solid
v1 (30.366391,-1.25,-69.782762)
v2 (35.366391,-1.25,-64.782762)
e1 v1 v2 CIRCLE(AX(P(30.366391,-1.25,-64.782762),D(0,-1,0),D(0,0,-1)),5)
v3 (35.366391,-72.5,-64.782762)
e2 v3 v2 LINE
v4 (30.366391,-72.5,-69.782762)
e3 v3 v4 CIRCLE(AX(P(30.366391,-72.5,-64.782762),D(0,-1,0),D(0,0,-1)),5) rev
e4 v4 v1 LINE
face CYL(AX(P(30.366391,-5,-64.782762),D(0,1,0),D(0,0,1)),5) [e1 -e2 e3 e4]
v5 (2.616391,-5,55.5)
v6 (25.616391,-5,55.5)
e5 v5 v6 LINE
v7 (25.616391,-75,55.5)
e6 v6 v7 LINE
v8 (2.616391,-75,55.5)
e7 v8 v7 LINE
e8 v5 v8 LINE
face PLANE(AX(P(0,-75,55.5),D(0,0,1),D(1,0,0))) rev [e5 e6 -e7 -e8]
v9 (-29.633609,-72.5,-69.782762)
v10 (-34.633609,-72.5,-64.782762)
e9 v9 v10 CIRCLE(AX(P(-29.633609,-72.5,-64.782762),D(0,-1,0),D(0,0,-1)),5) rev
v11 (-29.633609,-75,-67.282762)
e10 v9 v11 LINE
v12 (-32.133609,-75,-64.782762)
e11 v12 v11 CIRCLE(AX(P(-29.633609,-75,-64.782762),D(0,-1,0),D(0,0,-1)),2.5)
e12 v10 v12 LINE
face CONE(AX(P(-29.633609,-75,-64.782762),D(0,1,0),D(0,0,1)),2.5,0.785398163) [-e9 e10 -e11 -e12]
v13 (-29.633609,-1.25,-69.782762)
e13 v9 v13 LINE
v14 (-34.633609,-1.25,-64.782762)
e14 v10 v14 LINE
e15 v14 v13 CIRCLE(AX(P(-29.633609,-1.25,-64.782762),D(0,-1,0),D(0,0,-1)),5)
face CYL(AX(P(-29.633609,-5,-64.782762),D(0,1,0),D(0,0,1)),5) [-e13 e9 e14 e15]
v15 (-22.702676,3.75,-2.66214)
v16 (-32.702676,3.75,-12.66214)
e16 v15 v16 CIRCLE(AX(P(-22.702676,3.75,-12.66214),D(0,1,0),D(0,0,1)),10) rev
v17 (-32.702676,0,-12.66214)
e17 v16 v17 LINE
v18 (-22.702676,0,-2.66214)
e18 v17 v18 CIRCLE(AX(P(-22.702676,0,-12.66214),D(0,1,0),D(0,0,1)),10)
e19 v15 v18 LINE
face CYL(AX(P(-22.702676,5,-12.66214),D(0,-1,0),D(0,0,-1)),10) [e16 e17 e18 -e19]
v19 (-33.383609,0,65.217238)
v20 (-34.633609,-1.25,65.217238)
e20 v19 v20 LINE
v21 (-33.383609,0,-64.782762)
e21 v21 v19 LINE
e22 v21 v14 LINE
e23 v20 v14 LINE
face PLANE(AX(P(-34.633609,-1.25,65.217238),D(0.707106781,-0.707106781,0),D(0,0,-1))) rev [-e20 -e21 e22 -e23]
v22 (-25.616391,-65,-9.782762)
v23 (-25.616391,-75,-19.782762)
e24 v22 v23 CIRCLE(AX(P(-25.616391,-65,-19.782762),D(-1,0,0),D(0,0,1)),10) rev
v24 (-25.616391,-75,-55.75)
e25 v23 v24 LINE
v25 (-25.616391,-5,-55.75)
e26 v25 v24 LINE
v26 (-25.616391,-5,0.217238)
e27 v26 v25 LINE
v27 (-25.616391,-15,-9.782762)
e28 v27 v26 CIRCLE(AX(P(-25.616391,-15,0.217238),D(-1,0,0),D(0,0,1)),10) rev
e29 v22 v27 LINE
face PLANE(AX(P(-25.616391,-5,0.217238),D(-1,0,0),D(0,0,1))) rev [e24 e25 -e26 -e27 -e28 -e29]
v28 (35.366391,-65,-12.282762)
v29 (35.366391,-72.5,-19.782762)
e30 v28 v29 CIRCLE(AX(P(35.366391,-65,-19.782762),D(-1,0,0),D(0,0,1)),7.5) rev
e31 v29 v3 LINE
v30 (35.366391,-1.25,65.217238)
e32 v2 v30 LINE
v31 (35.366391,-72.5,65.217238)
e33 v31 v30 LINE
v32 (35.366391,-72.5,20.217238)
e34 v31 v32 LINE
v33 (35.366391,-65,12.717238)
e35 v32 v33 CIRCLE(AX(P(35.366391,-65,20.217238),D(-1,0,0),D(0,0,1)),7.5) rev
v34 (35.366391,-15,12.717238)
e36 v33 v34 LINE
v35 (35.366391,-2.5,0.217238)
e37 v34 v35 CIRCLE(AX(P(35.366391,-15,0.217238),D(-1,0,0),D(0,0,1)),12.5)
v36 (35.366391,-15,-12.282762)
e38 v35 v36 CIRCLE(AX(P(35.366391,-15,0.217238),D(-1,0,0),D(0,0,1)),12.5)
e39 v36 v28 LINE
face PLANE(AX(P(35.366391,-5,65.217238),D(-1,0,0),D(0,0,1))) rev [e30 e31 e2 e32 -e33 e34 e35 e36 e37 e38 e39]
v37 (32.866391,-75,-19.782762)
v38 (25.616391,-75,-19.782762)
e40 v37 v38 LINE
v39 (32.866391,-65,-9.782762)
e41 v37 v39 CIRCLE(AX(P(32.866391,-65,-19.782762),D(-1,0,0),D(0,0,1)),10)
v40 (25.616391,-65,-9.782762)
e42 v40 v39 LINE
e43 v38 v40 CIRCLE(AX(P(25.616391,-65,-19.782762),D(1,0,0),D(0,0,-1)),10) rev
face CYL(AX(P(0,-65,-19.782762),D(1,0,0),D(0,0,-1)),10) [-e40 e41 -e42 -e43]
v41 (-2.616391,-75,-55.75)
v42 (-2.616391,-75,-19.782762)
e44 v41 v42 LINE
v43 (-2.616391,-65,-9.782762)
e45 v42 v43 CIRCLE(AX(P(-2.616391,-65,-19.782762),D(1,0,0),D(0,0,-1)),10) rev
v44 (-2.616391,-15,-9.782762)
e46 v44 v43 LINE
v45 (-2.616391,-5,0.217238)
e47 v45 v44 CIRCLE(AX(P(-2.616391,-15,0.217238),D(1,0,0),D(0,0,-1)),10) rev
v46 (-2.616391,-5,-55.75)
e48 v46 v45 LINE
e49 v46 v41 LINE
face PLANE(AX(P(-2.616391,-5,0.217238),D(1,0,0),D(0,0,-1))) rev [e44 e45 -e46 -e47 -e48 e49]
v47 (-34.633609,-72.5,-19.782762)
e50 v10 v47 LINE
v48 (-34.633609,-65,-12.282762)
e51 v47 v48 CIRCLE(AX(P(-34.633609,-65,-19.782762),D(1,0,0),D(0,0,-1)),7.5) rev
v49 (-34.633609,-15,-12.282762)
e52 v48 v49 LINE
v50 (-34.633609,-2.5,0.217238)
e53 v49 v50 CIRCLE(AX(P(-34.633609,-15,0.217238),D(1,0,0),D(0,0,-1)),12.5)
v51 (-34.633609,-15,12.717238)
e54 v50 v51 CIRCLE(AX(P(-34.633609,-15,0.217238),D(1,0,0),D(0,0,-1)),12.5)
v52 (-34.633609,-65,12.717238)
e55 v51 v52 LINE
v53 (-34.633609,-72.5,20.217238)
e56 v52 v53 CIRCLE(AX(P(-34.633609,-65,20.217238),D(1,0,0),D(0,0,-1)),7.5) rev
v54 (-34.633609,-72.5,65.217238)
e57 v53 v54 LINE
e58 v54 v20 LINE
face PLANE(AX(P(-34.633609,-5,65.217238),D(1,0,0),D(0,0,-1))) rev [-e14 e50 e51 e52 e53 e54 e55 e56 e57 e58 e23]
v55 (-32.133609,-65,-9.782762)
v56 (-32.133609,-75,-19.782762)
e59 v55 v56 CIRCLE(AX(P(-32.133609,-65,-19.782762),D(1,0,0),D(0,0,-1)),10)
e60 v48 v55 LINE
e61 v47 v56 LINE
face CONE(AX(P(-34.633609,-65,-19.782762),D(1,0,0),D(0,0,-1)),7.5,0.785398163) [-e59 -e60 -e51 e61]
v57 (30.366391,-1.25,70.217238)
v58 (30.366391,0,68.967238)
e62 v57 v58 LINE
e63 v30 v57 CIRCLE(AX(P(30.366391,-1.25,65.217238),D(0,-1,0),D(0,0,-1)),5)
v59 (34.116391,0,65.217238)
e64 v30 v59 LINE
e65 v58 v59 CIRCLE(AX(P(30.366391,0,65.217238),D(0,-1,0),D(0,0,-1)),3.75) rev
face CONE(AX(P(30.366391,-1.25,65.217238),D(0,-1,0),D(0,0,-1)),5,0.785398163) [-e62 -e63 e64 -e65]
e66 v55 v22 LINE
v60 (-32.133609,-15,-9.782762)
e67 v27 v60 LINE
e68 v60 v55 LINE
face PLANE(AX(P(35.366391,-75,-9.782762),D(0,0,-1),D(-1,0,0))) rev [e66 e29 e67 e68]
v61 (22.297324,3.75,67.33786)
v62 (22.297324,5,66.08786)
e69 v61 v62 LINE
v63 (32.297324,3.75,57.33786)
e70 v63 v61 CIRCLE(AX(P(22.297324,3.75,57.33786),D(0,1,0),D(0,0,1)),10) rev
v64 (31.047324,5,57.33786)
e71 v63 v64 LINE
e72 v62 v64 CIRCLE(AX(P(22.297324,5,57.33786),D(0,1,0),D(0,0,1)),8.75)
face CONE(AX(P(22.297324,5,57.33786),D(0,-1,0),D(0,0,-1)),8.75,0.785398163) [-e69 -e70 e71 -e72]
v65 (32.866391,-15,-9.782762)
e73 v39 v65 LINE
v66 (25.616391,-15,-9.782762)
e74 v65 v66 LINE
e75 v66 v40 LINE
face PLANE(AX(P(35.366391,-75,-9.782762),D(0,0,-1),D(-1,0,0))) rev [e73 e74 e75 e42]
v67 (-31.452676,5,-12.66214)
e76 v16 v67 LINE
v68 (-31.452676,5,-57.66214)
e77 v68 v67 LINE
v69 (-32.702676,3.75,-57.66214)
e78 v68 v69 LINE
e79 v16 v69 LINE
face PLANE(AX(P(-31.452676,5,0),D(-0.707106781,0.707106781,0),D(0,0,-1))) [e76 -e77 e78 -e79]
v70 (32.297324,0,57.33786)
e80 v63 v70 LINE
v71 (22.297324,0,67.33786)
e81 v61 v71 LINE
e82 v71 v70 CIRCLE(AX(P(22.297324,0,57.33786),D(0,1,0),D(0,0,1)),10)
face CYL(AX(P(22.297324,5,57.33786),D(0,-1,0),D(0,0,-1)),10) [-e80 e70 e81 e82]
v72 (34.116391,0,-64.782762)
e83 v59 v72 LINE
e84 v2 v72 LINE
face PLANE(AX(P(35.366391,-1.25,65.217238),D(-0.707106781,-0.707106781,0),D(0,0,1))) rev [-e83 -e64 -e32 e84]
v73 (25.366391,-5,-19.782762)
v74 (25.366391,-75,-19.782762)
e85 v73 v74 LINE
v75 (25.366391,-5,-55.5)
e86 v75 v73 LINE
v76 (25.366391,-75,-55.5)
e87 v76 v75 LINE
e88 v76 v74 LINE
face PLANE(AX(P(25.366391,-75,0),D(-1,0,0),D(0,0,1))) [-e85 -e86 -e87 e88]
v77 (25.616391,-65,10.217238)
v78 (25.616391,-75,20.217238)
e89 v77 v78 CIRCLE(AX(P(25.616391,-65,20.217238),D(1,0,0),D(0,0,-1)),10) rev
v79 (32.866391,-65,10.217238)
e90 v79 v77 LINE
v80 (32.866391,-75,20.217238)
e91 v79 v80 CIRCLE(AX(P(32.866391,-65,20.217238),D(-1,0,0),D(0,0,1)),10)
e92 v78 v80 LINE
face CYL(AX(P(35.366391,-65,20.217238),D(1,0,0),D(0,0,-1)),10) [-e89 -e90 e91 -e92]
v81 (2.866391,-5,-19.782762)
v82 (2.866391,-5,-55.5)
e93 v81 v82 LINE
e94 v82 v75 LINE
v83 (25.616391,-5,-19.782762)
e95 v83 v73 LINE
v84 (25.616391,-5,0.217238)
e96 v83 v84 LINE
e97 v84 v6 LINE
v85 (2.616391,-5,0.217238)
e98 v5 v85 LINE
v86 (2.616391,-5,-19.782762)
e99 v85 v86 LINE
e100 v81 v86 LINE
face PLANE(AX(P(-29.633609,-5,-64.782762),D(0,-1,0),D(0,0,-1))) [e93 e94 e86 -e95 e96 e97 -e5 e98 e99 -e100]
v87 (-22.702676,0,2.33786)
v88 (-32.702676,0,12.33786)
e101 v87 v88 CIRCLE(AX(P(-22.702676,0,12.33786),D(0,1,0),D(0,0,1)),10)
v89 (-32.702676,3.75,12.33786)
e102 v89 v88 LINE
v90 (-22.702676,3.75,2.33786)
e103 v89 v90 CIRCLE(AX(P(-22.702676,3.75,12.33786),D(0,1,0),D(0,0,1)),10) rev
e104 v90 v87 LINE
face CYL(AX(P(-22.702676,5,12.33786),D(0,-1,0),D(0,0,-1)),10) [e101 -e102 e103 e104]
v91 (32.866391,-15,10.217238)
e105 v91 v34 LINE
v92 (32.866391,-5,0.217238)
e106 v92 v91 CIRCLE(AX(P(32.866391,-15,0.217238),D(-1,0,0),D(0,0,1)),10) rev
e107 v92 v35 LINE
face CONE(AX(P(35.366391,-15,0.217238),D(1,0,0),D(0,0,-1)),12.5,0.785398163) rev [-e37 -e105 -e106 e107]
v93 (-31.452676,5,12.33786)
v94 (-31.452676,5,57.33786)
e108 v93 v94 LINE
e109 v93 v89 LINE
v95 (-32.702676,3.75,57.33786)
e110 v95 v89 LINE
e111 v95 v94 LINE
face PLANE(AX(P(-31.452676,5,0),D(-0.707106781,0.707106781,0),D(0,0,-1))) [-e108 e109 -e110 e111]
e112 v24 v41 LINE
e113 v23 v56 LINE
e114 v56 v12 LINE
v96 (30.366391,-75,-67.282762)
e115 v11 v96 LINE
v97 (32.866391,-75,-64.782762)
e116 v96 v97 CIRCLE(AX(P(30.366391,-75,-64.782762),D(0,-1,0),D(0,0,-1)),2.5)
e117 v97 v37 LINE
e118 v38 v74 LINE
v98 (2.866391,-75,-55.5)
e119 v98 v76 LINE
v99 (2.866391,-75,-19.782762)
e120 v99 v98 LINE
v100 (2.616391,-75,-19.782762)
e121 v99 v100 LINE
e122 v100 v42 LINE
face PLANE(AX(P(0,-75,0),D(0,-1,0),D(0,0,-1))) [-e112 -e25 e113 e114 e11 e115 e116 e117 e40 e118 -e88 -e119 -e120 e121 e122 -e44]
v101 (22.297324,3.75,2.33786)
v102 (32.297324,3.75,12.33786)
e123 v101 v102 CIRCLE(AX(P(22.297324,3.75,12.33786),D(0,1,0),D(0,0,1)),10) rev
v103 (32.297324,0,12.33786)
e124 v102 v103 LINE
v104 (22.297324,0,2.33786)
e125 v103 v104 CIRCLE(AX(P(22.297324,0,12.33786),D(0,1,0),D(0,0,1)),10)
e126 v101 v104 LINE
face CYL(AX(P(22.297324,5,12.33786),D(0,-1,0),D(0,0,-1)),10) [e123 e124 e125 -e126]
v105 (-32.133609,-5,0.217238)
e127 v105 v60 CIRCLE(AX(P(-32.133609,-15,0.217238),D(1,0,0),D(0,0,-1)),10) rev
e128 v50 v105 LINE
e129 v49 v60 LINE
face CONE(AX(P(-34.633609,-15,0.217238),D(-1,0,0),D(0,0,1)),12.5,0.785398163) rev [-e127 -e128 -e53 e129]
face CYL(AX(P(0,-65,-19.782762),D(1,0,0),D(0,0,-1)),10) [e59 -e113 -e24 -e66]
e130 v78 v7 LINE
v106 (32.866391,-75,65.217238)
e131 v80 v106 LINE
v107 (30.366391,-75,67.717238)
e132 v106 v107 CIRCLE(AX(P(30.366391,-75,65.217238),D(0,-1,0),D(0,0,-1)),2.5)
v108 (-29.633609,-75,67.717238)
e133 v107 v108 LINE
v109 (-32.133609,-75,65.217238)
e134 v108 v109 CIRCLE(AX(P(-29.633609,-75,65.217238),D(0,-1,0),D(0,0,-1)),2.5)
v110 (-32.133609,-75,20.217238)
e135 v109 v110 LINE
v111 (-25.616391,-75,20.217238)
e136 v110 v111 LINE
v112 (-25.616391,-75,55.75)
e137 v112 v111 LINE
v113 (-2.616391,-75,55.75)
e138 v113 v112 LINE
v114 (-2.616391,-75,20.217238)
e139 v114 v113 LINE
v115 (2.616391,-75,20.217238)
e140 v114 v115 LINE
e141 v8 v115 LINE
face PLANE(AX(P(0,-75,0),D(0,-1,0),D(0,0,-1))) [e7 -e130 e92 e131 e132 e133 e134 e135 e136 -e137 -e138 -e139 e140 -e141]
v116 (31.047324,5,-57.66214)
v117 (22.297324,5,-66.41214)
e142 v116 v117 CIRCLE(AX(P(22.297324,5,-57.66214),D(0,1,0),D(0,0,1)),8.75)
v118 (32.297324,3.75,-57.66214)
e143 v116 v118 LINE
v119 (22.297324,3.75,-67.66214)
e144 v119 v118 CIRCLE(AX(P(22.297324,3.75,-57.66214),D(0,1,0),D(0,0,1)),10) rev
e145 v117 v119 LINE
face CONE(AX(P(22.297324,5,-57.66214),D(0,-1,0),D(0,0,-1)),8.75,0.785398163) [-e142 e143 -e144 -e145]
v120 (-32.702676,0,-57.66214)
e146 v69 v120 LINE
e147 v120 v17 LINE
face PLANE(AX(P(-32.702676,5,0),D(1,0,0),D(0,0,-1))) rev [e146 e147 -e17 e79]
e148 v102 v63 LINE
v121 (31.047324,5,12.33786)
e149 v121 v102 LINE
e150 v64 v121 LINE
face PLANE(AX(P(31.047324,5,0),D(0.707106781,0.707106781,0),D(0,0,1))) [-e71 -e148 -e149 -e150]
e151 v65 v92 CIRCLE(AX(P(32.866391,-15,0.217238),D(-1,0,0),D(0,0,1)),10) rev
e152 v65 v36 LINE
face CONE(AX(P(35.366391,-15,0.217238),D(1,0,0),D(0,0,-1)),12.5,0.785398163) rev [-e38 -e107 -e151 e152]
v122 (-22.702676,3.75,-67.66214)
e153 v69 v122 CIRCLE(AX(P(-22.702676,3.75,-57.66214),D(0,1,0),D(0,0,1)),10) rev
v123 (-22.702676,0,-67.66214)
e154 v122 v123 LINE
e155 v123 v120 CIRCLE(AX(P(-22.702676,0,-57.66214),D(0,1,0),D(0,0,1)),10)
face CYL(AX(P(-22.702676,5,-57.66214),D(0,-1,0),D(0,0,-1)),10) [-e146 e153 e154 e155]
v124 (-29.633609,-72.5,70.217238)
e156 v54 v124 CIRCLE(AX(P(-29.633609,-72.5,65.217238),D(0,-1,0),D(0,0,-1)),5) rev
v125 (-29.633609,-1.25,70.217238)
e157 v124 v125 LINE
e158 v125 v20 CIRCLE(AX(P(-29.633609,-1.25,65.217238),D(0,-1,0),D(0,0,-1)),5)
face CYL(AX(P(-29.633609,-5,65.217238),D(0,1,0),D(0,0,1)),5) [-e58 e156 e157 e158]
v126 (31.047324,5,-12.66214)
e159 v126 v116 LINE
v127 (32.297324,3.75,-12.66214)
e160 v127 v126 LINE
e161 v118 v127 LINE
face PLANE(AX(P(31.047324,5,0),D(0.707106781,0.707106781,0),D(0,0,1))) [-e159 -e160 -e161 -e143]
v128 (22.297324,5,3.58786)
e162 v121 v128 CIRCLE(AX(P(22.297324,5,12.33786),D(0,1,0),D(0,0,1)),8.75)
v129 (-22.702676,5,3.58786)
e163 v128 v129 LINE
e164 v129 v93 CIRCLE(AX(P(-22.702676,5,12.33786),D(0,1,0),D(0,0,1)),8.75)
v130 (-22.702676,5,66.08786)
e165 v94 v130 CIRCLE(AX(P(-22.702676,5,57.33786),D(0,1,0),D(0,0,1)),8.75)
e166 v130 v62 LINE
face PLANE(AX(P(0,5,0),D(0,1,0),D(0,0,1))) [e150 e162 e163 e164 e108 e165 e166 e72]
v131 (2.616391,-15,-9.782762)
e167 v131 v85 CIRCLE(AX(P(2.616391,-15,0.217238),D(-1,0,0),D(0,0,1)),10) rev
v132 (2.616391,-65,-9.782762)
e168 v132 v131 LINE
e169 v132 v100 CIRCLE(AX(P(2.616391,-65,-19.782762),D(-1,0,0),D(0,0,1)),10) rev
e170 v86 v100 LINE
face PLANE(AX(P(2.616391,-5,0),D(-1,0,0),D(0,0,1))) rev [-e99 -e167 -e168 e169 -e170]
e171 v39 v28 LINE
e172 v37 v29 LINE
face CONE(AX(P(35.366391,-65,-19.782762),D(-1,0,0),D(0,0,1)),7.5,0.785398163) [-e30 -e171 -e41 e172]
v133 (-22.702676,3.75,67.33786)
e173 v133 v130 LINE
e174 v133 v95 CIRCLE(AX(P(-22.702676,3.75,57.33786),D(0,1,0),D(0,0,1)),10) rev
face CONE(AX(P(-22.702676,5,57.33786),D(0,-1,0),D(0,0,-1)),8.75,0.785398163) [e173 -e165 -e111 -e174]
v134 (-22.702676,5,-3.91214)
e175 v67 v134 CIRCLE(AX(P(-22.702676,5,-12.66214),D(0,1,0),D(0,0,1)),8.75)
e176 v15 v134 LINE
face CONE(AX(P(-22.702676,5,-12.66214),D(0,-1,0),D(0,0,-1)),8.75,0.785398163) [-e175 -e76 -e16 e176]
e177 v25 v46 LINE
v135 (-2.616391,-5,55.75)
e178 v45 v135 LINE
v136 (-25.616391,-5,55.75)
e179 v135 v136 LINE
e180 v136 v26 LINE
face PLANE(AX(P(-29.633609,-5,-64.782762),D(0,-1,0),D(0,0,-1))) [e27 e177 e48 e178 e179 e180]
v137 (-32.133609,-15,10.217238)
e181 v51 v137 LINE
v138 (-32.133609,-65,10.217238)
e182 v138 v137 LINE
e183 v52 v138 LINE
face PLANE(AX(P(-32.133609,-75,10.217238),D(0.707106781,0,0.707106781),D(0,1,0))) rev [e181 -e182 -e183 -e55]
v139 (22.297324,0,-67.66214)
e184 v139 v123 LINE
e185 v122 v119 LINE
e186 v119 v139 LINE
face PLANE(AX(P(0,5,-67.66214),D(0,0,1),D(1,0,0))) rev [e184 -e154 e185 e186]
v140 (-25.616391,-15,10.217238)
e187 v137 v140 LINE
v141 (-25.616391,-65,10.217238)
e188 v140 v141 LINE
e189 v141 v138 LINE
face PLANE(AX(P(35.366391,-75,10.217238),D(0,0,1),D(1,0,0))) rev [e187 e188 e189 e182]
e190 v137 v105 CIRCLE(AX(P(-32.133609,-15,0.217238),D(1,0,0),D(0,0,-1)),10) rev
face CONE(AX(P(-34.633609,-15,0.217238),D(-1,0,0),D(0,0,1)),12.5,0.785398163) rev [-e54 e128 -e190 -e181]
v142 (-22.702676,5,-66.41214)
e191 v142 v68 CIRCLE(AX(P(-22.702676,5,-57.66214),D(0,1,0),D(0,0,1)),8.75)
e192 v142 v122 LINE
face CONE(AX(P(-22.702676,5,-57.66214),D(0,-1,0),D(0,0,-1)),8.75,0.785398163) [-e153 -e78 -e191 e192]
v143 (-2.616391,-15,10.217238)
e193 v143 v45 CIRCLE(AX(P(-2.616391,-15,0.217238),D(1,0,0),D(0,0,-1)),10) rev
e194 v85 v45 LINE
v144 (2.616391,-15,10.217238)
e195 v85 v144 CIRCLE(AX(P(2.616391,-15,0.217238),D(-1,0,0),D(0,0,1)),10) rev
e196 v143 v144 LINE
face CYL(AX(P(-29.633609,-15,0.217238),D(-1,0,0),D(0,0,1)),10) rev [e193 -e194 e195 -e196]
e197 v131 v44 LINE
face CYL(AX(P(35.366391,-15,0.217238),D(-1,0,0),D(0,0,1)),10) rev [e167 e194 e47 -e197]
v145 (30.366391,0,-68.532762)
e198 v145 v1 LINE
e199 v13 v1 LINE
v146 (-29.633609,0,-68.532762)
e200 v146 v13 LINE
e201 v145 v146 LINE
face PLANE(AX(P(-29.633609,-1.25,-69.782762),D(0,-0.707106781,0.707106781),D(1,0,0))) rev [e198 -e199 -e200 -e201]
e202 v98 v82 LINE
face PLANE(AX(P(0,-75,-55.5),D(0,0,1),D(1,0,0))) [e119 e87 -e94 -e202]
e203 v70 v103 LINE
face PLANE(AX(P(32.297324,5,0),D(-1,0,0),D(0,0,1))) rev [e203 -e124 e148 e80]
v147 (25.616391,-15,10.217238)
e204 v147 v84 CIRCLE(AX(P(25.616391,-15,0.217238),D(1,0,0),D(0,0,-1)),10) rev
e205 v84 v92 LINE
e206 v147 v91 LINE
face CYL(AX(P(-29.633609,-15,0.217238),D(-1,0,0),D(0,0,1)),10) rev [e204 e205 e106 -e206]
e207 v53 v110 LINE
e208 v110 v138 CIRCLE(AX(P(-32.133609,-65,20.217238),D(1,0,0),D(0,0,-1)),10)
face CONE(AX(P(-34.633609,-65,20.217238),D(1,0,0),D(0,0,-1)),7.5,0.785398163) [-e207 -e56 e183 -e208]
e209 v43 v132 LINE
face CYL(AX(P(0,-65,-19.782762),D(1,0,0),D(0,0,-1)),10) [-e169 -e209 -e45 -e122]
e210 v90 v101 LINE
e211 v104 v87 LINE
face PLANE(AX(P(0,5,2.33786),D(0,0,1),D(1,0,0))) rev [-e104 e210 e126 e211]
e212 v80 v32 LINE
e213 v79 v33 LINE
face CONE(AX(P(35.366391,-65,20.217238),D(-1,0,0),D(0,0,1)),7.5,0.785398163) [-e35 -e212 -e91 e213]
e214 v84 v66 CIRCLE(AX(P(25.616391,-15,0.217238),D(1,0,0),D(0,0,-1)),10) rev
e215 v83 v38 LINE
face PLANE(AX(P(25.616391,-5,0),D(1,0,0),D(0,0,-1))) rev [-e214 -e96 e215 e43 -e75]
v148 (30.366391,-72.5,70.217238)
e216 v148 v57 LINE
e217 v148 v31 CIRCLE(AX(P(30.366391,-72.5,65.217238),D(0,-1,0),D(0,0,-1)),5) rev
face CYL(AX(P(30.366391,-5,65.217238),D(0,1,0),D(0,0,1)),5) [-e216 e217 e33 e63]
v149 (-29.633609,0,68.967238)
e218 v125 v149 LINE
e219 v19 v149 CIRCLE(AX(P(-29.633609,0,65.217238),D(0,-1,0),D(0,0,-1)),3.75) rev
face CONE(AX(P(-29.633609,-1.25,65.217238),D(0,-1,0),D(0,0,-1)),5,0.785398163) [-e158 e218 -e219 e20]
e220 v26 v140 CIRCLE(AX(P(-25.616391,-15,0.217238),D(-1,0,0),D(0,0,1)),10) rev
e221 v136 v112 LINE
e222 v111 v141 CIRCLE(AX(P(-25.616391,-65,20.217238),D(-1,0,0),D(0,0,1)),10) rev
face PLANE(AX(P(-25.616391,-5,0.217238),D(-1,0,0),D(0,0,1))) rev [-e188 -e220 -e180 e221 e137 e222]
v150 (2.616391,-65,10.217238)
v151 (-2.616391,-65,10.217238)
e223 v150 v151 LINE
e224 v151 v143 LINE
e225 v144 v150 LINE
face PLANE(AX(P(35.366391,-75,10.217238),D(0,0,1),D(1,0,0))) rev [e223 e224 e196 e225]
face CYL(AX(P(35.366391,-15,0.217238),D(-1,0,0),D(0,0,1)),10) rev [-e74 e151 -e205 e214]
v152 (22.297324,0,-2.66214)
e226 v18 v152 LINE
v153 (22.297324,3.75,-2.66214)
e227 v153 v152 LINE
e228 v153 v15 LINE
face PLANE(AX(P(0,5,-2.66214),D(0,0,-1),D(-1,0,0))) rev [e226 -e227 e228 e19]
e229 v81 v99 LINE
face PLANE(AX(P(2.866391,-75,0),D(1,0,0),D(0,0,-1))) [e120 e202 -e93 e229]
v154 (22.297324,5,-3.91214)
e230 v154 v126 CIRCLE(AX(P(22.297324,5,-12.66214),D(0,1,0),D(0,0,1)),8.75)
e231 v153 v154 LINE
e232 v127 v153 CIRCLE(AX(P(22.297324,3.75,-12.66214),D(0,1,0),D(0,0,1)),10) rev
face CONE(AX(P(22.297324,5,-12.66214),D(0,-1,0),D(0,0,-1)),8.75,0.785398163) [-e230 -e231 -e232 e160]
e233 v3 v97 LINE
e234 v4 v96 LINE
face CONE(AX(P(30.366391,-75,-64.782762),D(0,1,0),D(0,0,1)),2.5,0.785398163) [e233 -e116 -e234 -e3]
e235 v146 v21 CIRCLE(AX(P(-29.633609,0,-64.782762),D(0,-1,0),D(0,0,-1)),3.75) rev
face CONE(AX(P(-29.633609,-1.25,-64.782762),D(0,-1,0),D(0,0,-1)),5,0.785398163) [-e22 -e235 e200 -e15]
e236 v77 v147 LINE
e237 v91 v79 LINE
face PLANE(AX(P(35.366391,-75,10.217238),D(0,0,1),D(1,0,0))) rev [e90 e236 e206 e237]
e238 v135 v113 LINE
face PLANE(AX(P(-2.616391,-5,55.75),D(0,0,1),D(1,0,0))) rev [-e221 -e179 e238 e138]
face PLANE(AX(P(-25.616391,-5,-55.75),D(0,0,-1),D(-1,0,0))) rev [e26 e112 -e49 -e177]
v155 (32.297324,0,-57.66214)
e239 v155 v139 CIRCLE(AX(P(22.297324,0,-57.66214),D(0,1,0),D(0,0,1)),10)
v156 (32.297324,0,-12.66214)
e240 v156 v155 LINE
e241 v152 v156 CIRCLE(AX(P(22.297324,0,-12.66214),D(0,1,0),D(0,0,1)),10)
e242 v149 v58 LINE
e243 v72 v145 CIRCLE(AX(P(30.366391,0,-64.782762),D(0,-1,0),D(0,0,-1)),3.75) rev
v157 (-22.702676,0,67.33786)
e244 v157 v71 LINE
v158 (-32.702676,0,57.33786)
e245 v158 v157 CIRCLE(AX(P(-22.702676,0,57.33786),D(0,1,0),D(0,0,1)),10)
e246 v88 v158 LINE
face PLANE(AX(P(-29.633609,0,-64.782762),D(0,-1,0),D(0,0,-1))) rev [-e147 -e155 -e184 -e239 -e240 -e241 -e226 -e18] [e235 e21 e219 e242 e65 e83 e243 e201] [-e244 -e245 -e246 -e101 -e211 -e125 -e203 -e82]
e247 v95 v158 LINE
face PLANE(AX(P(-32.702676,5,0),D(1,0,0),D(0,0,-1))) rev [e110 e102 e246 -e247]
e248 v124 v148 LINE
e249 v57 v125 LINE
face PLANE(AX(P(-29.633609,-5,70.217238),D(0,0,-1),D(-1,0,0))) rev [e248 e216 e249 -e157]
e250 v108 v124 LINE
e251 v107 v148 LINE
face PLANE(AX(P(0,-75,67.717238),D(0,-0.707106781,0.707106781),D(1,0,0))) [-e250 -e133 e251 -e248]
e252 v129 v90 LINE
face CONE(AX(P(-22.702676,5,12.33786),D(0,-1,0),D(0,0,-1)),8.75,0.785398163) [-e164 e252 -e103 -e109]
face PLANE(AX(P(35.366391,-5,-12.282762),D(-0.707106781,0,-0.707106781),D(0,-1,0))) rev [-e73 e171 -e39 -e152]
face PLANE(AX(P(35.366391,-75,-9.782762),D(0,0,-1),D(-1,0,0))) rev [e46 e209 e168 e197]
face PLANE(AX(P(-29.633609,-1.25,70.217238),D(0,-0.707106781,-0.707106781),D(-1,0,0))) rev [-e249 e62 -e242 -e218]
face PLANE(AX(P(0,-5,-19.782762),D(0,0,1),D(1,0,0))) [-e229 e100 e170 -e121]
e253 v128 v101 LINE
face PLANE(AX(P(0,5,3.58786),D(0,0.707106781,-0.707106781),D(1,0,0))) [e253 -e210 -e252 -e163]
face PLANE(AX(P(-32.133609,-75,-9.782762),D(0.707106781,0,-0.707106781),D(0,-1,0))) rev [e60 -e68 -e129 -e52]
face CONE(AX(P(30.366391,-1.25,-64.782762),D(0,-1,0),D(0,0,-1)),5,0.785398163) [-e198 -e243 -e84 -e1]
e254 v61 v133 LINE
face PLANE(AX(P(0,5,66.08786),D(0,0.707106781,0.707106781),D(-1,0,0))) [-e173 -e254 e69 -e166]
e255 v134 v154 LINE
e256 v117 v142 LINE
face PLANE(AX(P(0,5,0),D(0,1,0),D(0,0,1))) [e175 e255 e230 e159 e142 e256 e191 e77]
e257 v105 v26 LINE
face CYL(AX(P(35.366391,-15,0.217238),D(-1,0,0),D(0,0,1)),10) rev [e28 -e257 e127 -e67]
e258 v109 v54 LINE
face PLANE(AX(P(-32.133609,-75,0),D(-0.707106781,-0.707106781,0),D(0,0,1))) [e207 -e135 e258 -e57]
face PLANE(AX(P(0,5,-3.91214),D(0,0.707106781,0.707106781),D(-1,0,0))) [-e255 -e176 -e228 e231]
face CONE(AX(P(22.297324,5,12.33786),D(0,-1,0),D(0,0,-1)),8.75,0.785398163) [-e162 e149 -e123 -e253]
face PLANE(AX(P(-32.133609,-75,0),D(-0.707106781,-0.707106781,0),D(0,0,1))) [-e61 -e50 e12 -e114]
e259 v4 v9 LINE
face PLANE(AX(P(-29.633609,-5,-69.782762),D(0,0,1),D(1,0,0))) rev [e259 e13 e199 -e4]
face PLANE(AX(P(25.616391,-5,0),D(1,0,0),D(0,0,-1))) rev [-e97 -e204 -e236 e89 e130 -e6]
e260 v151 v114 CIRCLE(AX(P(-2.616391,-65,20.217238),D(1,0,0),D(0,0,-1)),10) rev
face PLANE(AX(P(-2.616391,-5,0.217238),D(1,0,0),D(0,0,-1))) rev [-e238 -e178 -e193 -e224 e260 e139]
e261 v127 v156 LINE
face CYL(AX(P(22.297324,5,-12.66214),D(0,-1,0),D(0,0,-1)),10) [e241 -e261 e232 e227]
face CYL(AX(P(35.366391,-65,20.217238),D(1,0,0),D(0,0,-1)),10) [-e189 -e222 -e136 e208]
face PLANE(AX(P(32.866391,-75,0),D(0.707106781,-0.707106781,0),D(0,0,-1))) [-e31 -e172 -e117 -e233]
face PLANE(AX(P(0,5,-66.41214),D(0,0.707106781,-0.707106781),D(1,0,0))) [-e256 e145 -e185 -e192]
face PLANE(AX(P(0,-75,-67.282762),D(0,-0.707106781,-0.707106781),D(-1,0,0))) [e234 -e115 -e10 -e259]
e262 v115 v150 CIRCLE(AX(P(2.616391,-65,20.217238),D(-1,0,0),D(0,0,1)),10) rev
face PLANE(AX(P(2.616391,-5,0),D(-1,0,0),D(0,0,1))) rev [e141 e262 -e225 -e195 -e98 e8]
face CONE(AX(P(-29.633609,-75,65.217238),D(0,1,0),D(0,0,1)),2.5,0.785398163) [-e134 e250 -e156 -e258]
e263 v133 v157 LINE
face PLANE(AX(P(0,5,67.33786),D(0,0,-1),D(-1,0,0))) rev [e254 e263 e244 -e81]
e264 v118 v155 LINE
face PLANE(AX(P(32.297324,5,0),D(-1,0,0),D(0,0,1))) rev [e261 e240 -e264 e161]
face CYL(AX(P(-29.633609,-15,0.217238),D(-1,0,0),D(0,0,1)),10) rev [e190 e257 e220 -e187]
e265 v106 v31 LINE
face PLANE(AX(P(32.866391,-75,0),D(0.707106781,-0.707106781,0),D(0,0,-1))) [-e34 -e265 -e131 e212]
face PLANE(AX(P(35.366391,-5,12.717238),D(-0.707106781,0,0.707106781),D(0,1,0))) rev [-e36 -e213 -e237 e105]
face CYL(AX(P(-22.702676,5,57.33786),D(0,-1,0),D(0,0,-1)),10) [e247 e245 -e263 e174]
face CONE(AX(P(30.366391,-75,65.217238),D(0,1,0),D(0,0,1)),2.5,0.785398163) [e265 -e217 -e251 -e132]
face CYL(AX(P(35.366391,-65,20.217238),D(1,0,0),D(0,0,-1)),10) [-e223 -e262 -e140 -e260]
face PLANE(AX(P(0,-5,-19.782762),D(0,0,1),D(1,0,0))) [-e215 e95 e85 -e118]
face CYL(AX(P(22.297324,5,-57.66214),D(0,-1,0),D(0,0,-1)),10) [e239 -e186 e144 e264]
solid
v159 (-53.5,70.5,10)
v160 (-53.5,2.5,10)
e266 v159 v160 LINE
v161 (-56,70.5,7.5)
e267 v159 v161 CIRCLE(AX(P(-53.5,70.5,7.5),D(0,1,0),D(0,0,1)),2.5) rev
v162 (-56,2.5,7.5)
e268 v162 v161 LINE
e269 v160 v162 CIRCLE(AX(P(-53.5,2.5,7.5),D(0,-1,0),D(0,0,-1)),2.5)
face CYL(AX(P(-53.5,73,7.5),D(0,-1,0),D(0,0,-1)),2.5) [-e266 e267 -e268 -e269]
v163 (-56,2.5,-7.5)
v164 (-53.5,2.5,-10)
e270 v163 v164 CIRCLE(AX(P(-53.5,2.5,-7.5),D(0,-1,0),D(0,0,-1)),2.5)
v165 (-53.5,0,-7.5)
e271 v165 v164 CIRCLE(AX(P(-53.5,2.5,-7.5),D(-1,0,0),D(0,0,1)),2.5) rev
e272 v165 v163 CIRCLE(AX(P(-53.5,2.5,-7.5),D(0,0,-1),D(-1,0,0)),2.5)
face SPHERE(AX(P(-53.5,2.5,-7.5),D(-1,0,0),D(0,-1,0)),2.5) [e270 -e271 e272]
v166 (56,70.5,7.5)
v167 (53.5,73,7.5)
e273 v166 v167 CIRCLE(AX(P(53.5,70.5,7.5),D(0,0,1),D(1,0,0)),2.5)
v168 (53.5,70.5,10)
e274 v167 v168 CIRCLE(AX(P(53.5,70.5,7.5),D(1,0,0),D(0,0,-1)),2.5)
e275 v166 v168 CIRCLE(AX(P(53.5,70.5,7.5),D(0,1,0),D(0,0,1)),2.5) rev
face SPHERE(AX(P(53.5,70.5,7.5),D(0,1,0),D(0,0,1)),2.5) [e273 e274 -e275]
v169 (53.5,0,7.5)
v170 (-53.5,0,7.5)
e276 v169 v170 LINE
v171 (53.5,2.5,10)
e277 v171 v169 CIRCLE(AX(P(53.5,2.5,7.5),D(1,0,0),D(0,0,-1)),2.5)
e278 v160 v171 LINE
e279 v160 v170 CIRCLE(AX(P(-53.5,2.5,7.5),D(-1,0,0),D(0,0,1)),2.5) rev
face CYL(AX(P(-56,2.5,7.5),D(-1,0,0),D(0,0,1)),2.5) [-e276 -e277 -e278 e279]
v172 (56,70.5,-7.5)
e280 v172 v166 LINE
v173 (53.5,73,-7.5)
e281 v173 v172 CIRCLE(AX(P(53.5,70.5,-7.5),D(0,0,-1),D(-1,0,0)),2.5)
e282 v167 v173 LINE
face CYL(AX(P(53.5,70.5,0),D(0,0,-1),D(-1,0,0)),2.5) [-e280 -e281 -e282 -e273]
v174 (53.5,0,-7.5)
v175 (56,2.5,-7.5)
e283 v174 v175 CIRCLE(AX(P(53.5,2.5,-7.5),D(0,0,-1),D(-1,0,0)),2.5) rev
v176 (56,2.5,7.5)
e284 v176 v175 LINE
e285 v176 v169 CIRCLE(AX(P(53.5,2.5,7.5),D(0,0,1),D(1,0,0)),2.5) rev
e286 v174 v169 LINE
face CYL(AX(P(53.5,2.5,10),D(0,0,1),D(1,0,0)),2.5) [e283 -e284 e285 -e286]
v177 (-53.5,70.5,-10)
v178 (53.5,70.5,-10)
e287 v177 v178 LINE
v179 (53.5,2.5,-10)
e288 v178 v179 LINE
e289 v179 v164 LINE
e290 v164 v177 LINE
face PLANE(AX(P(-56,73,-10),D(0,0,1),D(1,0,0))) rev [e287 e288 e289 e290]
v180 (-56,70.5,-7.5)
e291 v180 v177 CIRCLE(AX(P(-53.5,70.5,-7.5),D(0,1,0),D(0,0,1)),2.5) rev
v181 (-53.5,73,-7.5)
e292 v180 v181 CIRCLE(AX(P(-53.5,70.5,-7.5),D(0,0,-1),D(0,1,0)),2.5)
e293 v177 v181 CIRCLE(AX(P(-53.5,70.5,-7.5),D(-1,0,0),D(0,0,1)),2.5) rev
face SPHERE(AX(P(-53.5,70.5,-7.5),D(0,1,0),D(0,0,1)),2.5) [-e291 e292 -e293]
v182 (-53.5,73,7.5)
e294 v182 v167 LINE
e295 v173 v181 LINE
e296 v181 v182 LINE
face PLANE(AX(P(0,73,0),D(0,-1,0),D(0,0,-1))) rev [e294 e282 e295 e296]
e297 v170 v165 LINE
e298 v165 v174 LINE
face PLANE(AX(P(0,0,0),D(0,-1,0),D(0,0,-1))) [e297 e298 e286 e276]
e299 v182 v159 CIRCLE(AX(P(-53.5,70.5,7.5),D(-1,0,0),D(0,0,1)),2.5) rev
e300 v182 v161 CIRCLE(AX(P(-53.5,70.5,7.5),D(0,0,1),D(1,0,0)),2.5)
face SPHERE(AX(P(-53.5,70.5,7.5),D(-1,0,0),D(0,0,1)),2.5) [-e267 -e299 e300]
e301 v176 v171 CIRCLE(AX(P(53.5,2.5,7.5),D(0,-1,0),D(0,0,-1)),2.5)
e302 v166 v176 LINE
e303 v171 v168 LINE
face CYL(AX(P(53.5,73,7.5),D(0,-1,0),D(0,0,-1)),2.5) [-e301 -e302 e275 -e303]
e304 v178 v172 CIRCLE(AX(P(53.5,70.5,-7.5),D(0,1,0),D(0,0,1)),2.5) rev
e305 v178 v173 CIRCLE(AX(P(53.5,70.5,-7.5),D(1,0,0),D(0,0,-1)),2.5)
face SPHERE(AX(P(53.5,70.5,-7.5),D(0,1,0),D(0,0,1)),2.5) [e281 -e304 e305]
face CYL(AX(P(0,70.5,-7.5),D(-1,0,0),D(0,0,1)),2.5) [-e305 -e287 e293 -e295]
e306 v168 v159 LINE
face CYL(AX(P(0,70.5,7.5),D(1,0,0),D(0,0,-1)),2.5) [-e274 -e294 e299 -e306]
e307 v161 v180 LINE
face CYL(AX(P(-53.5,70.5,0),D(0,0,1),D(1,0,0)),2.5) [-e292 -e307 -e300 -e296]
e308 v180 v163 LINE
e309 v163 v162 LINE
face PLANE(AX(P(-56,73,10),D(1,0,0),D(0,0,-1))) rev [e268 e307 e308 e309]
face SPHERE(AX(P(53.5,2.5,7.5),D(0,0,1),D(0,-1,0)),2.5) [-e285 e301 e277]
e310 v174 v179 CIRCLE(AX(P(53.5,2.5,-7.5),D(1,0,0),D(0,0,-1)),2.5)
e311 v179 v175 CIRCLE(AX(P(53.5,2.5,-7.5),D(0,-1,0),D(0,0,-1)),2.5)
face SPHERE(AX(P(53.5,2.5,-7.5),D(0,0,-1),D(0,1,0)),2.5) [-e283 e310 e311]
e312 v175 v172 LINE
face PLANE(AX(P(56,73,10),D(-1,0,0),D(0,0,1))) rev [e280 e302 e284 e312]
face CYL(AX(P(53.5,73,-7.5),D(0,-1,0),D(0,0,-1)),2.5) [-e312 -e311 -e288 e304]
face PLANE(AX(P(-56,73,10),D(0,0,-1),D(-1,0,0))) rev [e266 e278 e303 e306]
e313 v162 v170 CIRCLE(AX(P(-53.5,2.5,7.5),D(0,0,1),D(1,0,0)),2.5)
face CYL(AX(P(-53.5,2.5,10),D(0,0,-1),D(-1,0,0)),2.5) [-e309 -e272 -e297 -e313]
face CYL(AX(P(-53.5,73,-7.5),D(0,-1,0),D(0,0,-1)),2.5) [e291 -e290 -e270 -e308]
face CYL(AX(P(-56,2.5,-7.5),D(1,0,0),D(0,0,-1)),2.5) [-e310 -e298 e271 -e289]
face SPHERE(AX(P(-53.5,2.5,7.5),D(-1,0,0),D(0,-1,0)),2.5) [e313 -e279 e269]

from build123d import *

# Parameters (mm, degrees)
SKETCH1_W             = 112
SKETCH1_H             = 20
BOSS_EXTRUDE1_DEPTH   = 73
FILLET1_R             = 2.5
BOSS_EXTRUDE5_DEPTH   = 5
BOSS_EXTRUDE5_2_DEPTH = 5
BOSS_EXTRUDE9_DEPTH   = 5
SKETCH10_W            = 22.5
SKETCH10_H            = 111
BOSS_EXTRUDE10_DEPTH  = 70
CUT_EXTRUDE1_DEPTH    = 70
FILLET14_R            = 10
FILLET15_R            = 10
CHAMFER1_SIZE         = 2.5
CHAMFER2_SIZE         = 1.25
CUT_EXTRUDE2_DEPTH    = 70
CUT_EXTRUDE3_DEPTH    = 70
CHAMFER3_SIZE         = 1.25


with BuildPart() as part:
    # Sketch1 → Boss-Extrude1 (new body)
    with BuildSketch(Plane(origin=(0, 0, 0), x_dir=(1, 0, 0), z_dir=(0, 1, 0))):
        Rectangle(SKETCH1_W, SKETCH1_H)
    extrude(amount=BOSS_EXTRUDE1_DEPTH)

    # Fillet1
    fillet1_edges = [part.edges().sort_by_distance(p)[0] for p in [
        (-56, 73, 0),
        (0, 73, 10),
        (56, 73, 0),
        (0, 0, 10),
        (-56, 0, 0),
        (0, 0, -10),
        (56, 0, 0),
        (56, 36.5, 10),
        (-56, 36.5, 10),
        (-56, 36.5, -10),
        (56, 36.5, -10),
        (0, 73, -10),
    ]]
    fillet(fillet1_edges, radius=FILLET1_R)


with BuildPart() as body_2:
    # Sketch7 → Boss-Extrude5 (new body)
    with BuildSketch(Plane(origin=(0, 0, 0), x_dir=(1, 0, 0), z_dir=(0, 1, 0))):
        with BuildLine():
            Line((32.297324425, -57.33785954), (32.297324425, -12.33785954))
            ThreePointArc((32.297324425, -12.33785954), (29.368392237, -5.266791728), (22.297324425, -2.33785954))
            Line((22.297324425, -2.33785954), (-22.702675575, -2.33785954))
            ThreePointArc((-22.702675575, -2.33785954), (-29.773743387, -5.266791728), (-32.702675575, -12.33785954))
            Line((-32.702675575, -12.33785954), (-32.702675575, -57.33785954))
            ThreePointArc((-32.702675575, -57.33785954), (-29.773743387, -64.408927352), (-22.702675575, -67.33785954))
            Line((-22.702675575, -67.33785954), (22.297324425, -67.33785954))
            ThreePointArc((22.297324425, -67.33785954), (29.368392237, -64.408927352), (32.297324425, -57.33785954))
        make_face()
    extrude(amount=BOSS_EXTRUDE5_DEPTH)


with BuildPart() as body_3:
    # Sketch7 → Boss-Extrude5 2 (new body)
    with BuildSketch(Plane(origin=(0, 0, 0), x_dir=(1, 0, 0), z_dir=(0, 1, 0))):
        with BuildLine():
            Line((-32.702675575, 57.66214046), (-32.702675575, 12.66214046))
            ThreePointArc((-32.702675575, 12.66214046), (-29.773743387, 5.591072648), (-22.702675575, 2.66214046))
            Line((-22.702675575, 2.66214046), (22.297324425, 2.66214046))
            ThreePointArc((22.297324425, 2.66214046), (29.368392237, 5.591072648), (32.297324425, 12.66214046))
            Line((32.297324425, 12.66214046), (32.297324425, 57.66214046))
            ThreePointArc((32.297324425, 57.66214046), (29.368392237, 64.733208272), (22.297324425, 67.66214046))
            Line((22.297324425, 67.66214046), (-22.702675575, 67.66214046))
            ThreePointArc((-22.702675575, 67.66214046), (-29.773743387, 64.733208272), (-32.702675575, 57.66214046))
        make_face()
    extrude(amount=BOSS_EXTRUDE5_2_DEPTH)


    add(body_2.part)  # Boss-Extrude9 merges body 2
    # Sketch9 → Boss-Extrude9 (add)
    with BuildSketch(Plane.XZ):
        with BuildLine():
            Line((-29.633608546, 70.217237559), (30.366391454, 70.217237559))
            ThreePointArc((30.366391454, 70.217237559), (33.90192536, 68.752771465), (35.366391454, 65.217237559))
            Line((35.366391454, 65.217237559), (35.366391454, -64.782762441))
            ThreePointArc((35.366391454, -64.782762441), (33.90192536, -68.318296346), (30.366391454, -69.782762441))
            Line((30.366391454, -69.782762441), (-29.633608546, -69.782762441))
            ThreePointArc((-29.633608546, -69.782762441), (-33.169142452, -68.318296346), (-34.633608546, -64.782762441))
            Line((-34.633608546, -64.782762441), (-34.633608546, 65.217237559))
            ThreePointArc((-34.633608546, 65.217237559), (-33.169142452, 68.752771465), (-29.633608546, 70.217237559))
        make_face()
    extrude(amount=BOSS_EXTRUDE9_DEPTH)

    # Sketch10 → Boss-Extrude10 (add)
    with BuildSketch(Plane.XZ.offset(5)):
        with BuildLine():
            Line((-34.633608546, 65.217237559), (-34.633608546, -64.782762441))
            ThreePointArc((-34.633608546, -64.782762441), (-33.169142452, -68.318296346), (-29.633608546, -69.782762441))
            Line((-29.633608546, -69.782762441), (30.366391454, -69.782762441))
            ThreePointArc((30.366391454, -69.782762441), (33.90192536, -68.318296346), (35.366391454, -64.782762441))
            Line((35.366391454, -64.782762441), (35.366391454, 65.217237559))
            ThreePointArc((35.366391454, 65.217237559), (33.90192536, 68.752771465), (30.366391454, 70.217237559))
            Line((30.366391454, 70.217237559), (-29.633608546, 70.217237559))
            ThreePointArc((-29.633608546, 70.217237559), (-33.169142452, 68.752771465), (-34.633608546, 65.217237559))
        make_face()
        with Locations((14.116391454, 0)):
            Rectangle(SKETCH10_W, SKETCH10_H, mode=Mode.SUBTRACT)
        with Locations((-14.116391454, 0)):
            Rectangle(SKETCH10_W, SKETCH10_H, mode=Mode.SUBTRACT)
    extrude(amount=BOSS_EXTRUDE10_DEPTH)

    # Sketch11 → Cut-Extrude1 (cut)
    with BuildSketch(Plane.ZY.offset(34.633608546)):
        Polygon((0.217237559, -5), (-9.782762441, -5), (-9.782762441, -75), (10.217237559, -75), (10.217237559, -5), align=None)
    extrude(amount=-CUT_EXTRUDE1_DEPTH, mode=Mode.SUBTRACT)

    # Fillet14
    fillet14_edges = [body_3.edges().sort_by_distance(p)[0] for p in [
        (-30, -5, 10.217237559),
        (-30, -5, -9.782762441),
        (0, -5, -9.782762441),
        (0, -5, 10.217237559),
        (30.366391454, -5, 10.217237559),
        (30.366391454, -5, -9.782762441),
    ]]
    fillet(fillet14_edges, radius=FILLET14_R - 0.0001)  # a hair under: the kernel refuses the full size

    # Fillet15
    fillet15_edges = [body_3.edges().sort_by_distance(p)[0] for p in [
        (0, -75, 10.217237559),
        (30.366391454, -75, 10.217237559),
        (-30, -75, 10.217237559),
        (0, -75, -9.782762441),
        (30.366391454, -75, -9.782762441),
        (-30, -75, -9.782762441),
    ]]
    fillet(fillet15_edges, radius=FILLET15_R)

    # Chamfer1
    chamfer1_edges = [body_3.edges().sort_by_distance(p)[0] for p in [
        (-34.633608546, -39.99995, -9.782762441),
        (35.366391454, -39.99995, -9.782762441),
        (-34.633608546, -7.928902899, 7.288334661),
        (-34.633608546, -7.928902899, -6.853859542),
        (35.366391454, -7.928902899, 7.288334661),
        (35.366391454, -7.928902899, -6.853859542),
        (35.366391454, -39.99995, 10.217237559),
        (35.366391454, -75, 42.717237559),
        (35.366391454, -72.071067812, -12.711694629),
        (35.366391454, -72.071067812, 13.146169748),
        (-34.633608546, -39.99995, 10.217237559),
        (-34.633608546, -75, -42.282762441),
        (-34.633608546, -72.071067812, -12.711694629),
        (-34.633608546, -72.071067812, 13.146169748),
        (-34.633608546, -75, 42.717237559),
        (-33.169142452, -75, -68.318296346),
        (0.366391454, -75, -69.782762441),
        (33.90192536, -75, -68.318296346),
        (35.366391454, -75, -42.282762441),
        (33.90192536, -75, 68.752771465),
        (0.366391454, -75, 70.217237559),
        (-33.169142452, -75, 68.752771465),
    ]]
    chamfer(chamfer1_edges, length=CHAMFER1_SIZE)

    # Chamfer2
    chamfer2_edges = [body_3.edges().sort_by_distance(p)[0] for p in [
        (-29.773743387, 5, -5.591072648),
        (-0.202675575, 5, -2.66214046),
        (29.368392237, 5, -5.591072648),
        (32.297324425, 5, -35.16214046),
        (29.368392237, 5, -64.733208272),
        (-0.202675575, 5, -67.66214046),
        (-29.773743387, 5, -64.733208272),
        (-32.702675575, 5, -35.16214046),
        (32.297324425, 5, 34.83785954),
        (29.368392237, 5, 5.266791728),
        (-0.202675575, 5, 2.33785954),
        (-29.773743387, 5, 5.266791728),
        (-32.702675575, 5, 34.83785954),
        (-29.773743387, 5, 64.408927352),
        (-0.202675575, 5, 67.33785954),
        (29.368392237, 5, 64.408927352),
    ]]
    chamfer(chamfer2_edges, length=CHAMFER2_SIZE)

    # Sketch12 → Cut-Extrude2 (cut)
    with BuildSketch(Plane.XZ.offset(75)):
        Polygon((-2.616391454, -19.782762441), (-2.616391454, -9.782762441), (-2.616391454, 0.217237559), (-2.616391454, 55.75), (-25.616391454, 55.75), (-25.616391454, 0.217237559), (-25.616391454, -55.75), (-2.616391454, -55.75), align=None)
    extrude(amount=-CUT_EXTRUDE2_DEPTH, mode=Mode.SUBTRACT)

    # Sketch13 → Cut-Extrude3 (cut)
    with BuildSketch(Plane.XZ.offset(75)):
        Polygon((25.616391454, 55.5), (2.616391454, 55.5), (2.616391454, 0.217237559), (2.616391454, -9.782762441), (2.616391454, -19.782762441), (2.866391454, -19.782762441), (2.866391454, -55.5), (25.366391454, -55.5), (25.366391454, -19.782762441), (25.616391454, -19.782762441), (25.616391454, -9.782762441), (25.616391454, 0.217237559), (25.616391454, 10.217237559), (25.616391454, 20.217237559), align=None)
    extrude(amount=-CUT_EXTRUDE3_DEPTH, mode=Mode.SUBTRACT)

    # Chamfer3
    chamfer3_edges = [body_3.edges().sort_by_distance(p)[0] for p in [
        (-33.169142452, 0, -68.318296346),
        (0.366391454, 0, -69.782762441),
        (33.90192536, 0, -68.318296346),
        (35.366391454, 0, 0.217237559),
        (33.90192536, 0, 68.752771465),
        (0.366391454, 0, 70.217237559),
        (-33.169142452, 0, 68.752771465),
        (-34.633608546, 0, 0.217237559),
    ]]
    chamfer(chamfer3_edges, length=CHAMFER3_SIZE)


solid = Compound([part.part, body_3.part])
